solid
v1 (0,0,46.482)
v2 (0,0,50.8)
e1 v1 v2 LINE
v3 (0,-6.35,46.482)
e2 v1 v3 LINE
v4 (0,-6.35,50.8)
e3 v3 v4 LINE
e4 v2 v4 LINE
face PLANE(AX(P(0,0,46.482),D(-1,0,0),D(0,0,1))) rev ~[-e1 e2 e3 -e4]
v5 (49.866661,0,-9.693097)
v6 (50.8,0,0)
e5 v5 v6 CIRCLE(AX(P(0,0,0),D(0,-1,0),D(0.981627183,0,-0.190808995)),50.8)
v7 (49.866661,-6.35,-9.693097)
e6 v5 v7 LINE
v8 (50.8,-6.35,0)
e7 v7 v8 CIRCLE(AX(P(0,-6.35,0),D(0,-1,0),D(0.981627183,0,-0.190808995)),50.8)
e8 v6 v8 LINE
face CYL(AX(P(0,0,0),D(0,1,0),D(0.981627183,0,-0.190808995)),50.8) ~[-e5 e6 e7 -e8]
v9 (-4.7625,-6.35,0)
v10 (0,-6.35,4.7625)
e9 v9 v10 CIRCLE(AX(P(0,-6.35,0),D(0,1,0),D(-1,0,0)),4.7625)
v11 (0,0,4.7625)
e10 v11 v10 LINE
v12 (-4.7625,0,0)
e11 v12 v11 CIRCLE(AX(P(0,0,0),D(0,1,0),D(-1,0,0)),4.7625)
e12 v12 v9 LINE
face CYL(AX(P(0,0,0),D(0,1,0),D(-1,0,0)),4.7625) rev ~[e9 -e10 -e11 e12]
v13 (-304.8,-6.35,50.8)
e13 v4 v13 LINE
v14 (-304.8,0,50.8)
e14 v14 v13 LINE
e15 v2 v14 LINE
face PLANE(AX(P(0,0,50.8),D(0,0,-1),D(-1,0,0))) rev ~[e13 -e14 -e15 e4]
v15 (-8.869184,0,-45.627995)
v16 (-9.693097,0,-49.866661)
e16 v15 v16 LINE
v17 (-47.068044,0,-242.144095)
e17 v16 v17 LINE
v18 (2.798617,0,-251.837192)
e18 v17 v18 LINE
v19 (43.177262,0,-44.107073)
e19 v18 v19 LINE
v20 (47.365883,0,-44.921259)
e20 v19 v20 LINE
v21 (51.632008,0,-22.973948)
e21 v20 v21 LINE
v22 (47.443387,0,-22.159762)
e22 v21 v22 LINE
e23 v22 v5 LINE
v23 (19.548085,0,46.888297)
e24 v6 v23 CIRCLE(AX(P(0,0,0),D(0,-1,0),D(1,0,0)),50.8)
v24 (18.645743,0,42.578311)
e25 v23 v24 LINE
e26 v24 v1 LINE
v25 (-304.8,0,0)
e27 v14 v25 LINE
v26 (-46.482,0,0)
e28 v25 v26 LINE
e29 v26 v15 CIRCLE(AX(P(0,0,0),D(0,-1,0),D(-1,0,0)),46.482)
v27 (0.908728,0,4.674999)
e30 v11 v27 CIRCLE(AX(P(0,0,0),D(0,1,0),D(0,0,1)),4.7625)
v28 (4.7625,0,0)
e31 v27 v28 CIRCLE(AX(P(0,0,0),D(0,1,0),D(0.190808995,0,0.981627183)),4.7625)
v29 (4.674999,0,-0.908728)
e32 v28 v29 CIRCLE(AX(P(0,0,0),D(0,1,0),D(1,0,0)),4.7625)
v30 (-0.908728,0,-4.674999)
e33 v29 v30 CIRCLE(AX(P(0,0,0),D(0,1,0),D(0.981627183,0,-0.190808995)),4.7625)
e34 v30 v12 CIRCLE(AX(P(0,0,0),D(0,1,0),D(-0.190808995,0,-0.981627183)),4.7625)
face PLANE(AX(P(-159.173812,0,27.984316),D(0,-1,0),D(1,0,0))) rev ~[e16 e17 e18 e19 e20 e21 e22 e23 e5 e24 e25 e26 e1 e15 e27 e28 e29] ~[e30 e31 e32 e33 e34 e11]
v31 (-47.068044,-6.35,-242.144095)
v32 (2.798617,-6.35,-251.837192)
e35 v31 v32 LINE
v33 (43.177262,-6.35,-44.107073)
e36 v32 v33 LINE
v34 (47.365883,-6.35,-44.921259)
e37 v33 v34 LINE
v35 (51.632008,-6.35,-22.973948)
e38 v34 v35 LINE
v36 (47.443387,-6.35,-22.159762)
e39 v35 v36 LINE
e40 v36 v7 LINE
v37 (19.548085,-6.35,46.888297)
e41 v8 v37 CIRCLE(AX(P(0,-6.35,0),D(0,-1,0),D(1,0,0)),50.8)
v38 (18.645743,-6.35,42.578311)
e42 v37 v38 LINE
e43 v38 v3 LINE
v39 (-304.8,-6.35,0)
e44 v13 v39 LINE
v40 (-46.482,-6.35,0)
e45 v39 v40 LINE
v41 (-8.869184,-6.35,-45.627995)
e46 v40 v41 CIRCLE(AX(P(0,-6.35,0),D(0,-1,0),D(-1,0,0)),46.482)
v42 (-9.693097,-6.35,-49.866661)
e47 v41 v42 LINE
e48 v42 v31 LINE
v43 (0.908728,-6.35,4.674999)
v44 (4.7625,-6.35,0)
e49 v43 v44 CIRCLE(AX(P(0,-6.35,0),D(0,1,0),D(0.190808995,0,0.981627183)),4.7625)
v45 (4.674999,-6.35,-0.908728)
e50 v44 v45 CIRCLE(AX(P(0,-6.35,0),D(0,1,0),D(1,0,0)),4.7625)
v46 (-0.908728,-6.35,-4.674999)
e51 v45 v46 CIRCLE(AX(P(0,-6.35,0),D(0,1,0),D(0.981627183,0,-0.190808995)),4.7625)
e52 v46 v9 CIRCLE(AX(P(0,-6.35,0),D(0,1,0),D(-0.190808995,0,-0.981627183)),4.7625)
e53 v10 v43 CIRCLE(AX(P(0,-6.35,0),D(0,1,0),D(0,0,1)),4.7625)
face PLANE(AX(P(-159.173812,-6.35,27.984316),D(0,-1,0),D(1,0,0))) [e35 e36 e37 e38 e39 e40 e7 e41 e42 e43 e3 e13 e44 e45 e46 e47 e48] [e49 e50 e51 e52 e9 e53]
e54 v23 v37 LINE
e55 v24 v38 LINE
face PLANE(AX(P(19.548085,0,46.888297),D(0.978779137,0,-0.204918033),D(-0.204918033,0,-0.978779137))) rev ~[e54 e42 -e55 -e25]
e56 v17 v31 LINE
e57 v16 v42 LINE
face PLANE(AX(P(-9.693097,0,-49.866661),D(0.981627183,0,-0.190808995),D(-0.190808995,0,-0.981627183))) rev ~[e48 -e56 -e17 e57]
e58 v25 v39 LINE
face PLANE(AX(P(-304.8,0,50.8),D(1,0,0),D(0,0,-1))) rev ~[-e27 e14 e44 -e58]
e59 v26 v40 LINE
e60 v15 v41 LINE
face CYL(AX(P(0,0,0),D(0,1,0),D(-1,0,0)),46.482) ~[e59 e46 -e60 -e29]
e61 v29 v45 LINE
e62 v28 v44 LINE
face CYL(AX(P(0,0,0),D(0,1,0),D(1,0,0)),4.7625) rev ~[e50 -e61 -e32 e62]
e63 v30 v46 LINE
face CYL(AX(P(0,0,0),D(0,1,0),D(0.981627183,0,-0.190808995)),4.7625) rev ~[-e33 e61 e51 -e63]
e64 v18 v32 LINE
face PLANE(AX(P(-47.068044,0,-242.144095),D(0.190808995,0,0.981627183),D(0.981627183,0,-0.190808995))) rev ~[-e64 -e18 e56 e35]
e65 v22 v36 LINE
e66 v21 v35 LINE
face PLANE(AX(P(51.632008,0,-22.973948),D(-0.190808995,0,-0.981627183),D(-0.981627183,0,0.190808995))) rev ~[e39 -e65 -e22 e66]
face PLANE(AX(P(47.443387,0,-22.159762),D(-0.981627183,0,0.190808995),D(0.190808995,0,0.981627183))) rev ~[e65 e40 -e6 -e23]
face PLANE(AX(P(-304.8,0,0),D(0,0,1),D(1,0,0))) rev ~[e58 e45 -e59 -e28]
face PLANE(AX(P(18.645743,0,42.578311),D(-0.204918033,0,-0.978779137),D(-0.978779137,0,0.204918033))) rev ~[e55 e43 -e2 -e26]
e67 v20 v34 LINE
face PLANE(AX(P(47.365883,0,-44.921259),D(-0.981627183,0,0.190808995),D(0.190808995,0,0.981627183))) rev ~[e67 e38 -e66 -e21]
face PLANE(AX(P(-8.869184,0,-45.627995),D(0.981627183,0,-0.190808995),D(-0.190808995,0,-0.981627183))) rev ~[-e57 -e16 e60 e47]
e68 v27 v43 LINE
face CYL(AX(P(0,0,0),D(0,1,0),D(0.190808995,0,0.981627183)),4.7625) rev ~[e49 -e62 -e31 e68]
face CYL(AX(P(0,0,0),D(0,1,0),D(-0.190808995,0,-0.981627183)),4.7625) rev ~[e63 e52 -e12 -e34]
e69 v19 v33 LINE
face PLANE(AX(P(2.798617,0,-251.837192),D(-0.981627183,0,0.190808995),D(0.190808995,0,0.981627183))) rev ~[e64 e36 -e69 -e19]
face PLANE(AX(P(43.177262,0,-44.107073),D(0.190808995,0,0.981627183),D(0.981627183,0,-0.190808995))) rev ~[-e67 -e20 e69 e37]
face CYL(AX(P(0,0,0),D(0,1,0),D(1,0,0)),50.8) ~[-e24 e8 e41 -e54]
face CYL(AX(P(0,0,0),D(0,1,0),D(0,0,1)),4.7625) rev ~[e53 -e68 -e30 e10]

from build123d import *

# Parameters (mm, degrees)
F1_DEPTH = 6.35


with BuildPart() as f1:
    # F0 (on Front) → F1 (new body)
    with BuildSketch(Plane.XZ):
        with BuildLine():
            ThreePointArc((-50.8, 0), (-35.9210244843, 35.9210244843), (0, 50.8))
            Line((0, 50.8), (-304.8, 50.8))
            Line((-304.8, 50.8), (-304.8, 0))
            Line((-304.8, 0), (-50.8, 0))
        make_face()
        Polygon((51.6320080606, -22.9739477141), (46.3118022943, -27.9812591796), (43.1772616128, -44.1070730311), (47.3658829955, -44.9212585503), align=None)
        Polygon((51.6320080606, -22.9739477141), (47.4433866779, -22.1597621949), (46.3118022943, -27.9812591796), align=None)
        with BuildLine():
            Line((46.482, 0), (50.8, 0))
            ThreePointArc((50.8, 0), (42.2710462755, 28.1744325014), (19.5480847725, 46.8882968525))
            Line((19.5480847725, 46.8882968525), (18.6457425678, 42.5783114754))
            ThreePointArc((18.6457425678, 42.5783114754), (38.905447755, 25.4350635734), (46.482, 0))
        make_face()
        with BuildLine():
            Line((47.4433866779, -22.1597621949), (49.8666609191, -9.6930969651))
            ThreePointArc((49.8666609191, -9.6930969651), (28.4069994963, -42.1151086858), (-9.6930969651, -49.8666609191))
            Line((-9.6930969651, -49.8666609191), (-47.0680440019, -242.1440947937))
            Line((-47.0680440019, -242.1440947937), (2.7986169173, -251.8371917588))
            Line((2.7986169173, -251.8371917588), (43.1772616128, -44.1070730311))
            Line((43.1772616128, -44.1070730311), (46.3118022943, -27.9812591796))
            Line((46.3118022943, -27.9812591796), (47.4433866779, -22.1597621949))
        make_face()
        with BuildLine():
            ThreePointArc((49.8666609191, -9.6930969651), (50.5661268771, -4.868964228), (50.8, 0))
            Line((50.8, 0), (46.482, 0))
            ThreePointArc((46.482, 0), (46.2680060925, -4.4551022686), (45.627994741, -8.8691837231))
            Line((45.627994741, -8.8691837231), (49.8666609191, -9.6930969651))
        make_face()
        with BuildLine():
            Line((0, 46.482), (0, 50.8))
            ThreePointArc((0, 50.8), (-35.9210244843, 35.9210244843), (-50.8, 0))
            Line((-50.8, 0), (-46.482, 0))
            ThreePointArc((-46.482, 0), (-32.8677374031, 32.8677374031), (0, 46.482))
        make_face()
        with BuildLine():
            ThreePointArc((-9.6930969651, -49.8666609191), (28.4069994963, -42.1151086858), (49.8666609191, -9.6930969651))
            Line((49.8666609191, -9.6930969651), (45.627994741, -8.8691837231))
            ThreePointArc((45.627994741, -8.8691837231), (25.9924045391, -38.5353244475), (-8.8691837231, -45.627994741))
            Line((-8.8691837231, -45.627994741), (-9.6930969651, -49.8666609191))
        make_face()
        with BuildLine():
            Line((4.7625, 0), (46.482, 0))
            ThreePointArc((46.482, 0), (38.905447755, 25.4350635734), (18.6457425678, 42.5783114754))
            Line((18.6457425678, 42.5783114754), (0, 46.482))
            Line((0, 46.482), (0, 4.7625))
            ThreePointArc((0, 4.7625), (0.4564653964, 4.7405743947), (0.9087278405, 4.6749994612))
            ThreePointArc((0.9087278405, 4.6749994612), (3.6748620784, 3.0293225241), (4.7625, 0))
        make_face()
        with BuildLine():
            Line((0, 4.7625), (0, 46.482))
            ThreePointArc((0, 46.482), (-32.8677374031, 32.8677374031), (-46.482, 0))
            Line((-46.482, 0), (-4.7625, 0))
            ThreePointArc((-4.7625, 0), (-3.3675960454, 3.3675960454), (0, 4.7625))
        make_face()
        with BuildLine():
            ThreePointArc((-46.482, 0), (-35.866653885, -29.566187835), (-8.8691837231, -45.627994741))
            Line((-8.8691837231, -45.627994741), (-0.9087278405, -4.6749994612))
            ThreePointArc((-0.9087278405, -4.6749994612), (-3.6748620784, -3.0293225241), (-4.7625, 0))
            Line((-4.7625, 0), (-46.482, 0))
        make_face()
        with BuildLine():
            ThreePointArc((-8.8691837231, -45.627994741), (25.9924045391, -38.5353244475), (45.627994741, -8.8691837231))
            Line((45.627994741, -8.8691837231), (4.6749994612, -0.9087278405))
            ThreePointArc((4.6749994612, -0.9087278405), (2.6631562028, -3.9482914393), (-0.9087278405, -4.6749994612))
            Line((-0.9087278405, -4.6749994612), (-8.8691837231, -45.627994741))
        make_face()
        with BuildLine():
            ThreePointArc((45.627994741, -8.8691837231), (46.2680060925, -4.4551022686), (46.482, 0))
            Line((46.482, 0), (4.7625, 0))
            ThreePointArc((4.7625, 0), (4.7405743947, -0.4564653964), (4.6749994612, -0.9087278405))
            Line((4.6749994612, -0.9087278405), (45.627994741, -8.8691837231))
        make_face()
    extrude(amount=F1_DEPTH)


solid = f1.part
